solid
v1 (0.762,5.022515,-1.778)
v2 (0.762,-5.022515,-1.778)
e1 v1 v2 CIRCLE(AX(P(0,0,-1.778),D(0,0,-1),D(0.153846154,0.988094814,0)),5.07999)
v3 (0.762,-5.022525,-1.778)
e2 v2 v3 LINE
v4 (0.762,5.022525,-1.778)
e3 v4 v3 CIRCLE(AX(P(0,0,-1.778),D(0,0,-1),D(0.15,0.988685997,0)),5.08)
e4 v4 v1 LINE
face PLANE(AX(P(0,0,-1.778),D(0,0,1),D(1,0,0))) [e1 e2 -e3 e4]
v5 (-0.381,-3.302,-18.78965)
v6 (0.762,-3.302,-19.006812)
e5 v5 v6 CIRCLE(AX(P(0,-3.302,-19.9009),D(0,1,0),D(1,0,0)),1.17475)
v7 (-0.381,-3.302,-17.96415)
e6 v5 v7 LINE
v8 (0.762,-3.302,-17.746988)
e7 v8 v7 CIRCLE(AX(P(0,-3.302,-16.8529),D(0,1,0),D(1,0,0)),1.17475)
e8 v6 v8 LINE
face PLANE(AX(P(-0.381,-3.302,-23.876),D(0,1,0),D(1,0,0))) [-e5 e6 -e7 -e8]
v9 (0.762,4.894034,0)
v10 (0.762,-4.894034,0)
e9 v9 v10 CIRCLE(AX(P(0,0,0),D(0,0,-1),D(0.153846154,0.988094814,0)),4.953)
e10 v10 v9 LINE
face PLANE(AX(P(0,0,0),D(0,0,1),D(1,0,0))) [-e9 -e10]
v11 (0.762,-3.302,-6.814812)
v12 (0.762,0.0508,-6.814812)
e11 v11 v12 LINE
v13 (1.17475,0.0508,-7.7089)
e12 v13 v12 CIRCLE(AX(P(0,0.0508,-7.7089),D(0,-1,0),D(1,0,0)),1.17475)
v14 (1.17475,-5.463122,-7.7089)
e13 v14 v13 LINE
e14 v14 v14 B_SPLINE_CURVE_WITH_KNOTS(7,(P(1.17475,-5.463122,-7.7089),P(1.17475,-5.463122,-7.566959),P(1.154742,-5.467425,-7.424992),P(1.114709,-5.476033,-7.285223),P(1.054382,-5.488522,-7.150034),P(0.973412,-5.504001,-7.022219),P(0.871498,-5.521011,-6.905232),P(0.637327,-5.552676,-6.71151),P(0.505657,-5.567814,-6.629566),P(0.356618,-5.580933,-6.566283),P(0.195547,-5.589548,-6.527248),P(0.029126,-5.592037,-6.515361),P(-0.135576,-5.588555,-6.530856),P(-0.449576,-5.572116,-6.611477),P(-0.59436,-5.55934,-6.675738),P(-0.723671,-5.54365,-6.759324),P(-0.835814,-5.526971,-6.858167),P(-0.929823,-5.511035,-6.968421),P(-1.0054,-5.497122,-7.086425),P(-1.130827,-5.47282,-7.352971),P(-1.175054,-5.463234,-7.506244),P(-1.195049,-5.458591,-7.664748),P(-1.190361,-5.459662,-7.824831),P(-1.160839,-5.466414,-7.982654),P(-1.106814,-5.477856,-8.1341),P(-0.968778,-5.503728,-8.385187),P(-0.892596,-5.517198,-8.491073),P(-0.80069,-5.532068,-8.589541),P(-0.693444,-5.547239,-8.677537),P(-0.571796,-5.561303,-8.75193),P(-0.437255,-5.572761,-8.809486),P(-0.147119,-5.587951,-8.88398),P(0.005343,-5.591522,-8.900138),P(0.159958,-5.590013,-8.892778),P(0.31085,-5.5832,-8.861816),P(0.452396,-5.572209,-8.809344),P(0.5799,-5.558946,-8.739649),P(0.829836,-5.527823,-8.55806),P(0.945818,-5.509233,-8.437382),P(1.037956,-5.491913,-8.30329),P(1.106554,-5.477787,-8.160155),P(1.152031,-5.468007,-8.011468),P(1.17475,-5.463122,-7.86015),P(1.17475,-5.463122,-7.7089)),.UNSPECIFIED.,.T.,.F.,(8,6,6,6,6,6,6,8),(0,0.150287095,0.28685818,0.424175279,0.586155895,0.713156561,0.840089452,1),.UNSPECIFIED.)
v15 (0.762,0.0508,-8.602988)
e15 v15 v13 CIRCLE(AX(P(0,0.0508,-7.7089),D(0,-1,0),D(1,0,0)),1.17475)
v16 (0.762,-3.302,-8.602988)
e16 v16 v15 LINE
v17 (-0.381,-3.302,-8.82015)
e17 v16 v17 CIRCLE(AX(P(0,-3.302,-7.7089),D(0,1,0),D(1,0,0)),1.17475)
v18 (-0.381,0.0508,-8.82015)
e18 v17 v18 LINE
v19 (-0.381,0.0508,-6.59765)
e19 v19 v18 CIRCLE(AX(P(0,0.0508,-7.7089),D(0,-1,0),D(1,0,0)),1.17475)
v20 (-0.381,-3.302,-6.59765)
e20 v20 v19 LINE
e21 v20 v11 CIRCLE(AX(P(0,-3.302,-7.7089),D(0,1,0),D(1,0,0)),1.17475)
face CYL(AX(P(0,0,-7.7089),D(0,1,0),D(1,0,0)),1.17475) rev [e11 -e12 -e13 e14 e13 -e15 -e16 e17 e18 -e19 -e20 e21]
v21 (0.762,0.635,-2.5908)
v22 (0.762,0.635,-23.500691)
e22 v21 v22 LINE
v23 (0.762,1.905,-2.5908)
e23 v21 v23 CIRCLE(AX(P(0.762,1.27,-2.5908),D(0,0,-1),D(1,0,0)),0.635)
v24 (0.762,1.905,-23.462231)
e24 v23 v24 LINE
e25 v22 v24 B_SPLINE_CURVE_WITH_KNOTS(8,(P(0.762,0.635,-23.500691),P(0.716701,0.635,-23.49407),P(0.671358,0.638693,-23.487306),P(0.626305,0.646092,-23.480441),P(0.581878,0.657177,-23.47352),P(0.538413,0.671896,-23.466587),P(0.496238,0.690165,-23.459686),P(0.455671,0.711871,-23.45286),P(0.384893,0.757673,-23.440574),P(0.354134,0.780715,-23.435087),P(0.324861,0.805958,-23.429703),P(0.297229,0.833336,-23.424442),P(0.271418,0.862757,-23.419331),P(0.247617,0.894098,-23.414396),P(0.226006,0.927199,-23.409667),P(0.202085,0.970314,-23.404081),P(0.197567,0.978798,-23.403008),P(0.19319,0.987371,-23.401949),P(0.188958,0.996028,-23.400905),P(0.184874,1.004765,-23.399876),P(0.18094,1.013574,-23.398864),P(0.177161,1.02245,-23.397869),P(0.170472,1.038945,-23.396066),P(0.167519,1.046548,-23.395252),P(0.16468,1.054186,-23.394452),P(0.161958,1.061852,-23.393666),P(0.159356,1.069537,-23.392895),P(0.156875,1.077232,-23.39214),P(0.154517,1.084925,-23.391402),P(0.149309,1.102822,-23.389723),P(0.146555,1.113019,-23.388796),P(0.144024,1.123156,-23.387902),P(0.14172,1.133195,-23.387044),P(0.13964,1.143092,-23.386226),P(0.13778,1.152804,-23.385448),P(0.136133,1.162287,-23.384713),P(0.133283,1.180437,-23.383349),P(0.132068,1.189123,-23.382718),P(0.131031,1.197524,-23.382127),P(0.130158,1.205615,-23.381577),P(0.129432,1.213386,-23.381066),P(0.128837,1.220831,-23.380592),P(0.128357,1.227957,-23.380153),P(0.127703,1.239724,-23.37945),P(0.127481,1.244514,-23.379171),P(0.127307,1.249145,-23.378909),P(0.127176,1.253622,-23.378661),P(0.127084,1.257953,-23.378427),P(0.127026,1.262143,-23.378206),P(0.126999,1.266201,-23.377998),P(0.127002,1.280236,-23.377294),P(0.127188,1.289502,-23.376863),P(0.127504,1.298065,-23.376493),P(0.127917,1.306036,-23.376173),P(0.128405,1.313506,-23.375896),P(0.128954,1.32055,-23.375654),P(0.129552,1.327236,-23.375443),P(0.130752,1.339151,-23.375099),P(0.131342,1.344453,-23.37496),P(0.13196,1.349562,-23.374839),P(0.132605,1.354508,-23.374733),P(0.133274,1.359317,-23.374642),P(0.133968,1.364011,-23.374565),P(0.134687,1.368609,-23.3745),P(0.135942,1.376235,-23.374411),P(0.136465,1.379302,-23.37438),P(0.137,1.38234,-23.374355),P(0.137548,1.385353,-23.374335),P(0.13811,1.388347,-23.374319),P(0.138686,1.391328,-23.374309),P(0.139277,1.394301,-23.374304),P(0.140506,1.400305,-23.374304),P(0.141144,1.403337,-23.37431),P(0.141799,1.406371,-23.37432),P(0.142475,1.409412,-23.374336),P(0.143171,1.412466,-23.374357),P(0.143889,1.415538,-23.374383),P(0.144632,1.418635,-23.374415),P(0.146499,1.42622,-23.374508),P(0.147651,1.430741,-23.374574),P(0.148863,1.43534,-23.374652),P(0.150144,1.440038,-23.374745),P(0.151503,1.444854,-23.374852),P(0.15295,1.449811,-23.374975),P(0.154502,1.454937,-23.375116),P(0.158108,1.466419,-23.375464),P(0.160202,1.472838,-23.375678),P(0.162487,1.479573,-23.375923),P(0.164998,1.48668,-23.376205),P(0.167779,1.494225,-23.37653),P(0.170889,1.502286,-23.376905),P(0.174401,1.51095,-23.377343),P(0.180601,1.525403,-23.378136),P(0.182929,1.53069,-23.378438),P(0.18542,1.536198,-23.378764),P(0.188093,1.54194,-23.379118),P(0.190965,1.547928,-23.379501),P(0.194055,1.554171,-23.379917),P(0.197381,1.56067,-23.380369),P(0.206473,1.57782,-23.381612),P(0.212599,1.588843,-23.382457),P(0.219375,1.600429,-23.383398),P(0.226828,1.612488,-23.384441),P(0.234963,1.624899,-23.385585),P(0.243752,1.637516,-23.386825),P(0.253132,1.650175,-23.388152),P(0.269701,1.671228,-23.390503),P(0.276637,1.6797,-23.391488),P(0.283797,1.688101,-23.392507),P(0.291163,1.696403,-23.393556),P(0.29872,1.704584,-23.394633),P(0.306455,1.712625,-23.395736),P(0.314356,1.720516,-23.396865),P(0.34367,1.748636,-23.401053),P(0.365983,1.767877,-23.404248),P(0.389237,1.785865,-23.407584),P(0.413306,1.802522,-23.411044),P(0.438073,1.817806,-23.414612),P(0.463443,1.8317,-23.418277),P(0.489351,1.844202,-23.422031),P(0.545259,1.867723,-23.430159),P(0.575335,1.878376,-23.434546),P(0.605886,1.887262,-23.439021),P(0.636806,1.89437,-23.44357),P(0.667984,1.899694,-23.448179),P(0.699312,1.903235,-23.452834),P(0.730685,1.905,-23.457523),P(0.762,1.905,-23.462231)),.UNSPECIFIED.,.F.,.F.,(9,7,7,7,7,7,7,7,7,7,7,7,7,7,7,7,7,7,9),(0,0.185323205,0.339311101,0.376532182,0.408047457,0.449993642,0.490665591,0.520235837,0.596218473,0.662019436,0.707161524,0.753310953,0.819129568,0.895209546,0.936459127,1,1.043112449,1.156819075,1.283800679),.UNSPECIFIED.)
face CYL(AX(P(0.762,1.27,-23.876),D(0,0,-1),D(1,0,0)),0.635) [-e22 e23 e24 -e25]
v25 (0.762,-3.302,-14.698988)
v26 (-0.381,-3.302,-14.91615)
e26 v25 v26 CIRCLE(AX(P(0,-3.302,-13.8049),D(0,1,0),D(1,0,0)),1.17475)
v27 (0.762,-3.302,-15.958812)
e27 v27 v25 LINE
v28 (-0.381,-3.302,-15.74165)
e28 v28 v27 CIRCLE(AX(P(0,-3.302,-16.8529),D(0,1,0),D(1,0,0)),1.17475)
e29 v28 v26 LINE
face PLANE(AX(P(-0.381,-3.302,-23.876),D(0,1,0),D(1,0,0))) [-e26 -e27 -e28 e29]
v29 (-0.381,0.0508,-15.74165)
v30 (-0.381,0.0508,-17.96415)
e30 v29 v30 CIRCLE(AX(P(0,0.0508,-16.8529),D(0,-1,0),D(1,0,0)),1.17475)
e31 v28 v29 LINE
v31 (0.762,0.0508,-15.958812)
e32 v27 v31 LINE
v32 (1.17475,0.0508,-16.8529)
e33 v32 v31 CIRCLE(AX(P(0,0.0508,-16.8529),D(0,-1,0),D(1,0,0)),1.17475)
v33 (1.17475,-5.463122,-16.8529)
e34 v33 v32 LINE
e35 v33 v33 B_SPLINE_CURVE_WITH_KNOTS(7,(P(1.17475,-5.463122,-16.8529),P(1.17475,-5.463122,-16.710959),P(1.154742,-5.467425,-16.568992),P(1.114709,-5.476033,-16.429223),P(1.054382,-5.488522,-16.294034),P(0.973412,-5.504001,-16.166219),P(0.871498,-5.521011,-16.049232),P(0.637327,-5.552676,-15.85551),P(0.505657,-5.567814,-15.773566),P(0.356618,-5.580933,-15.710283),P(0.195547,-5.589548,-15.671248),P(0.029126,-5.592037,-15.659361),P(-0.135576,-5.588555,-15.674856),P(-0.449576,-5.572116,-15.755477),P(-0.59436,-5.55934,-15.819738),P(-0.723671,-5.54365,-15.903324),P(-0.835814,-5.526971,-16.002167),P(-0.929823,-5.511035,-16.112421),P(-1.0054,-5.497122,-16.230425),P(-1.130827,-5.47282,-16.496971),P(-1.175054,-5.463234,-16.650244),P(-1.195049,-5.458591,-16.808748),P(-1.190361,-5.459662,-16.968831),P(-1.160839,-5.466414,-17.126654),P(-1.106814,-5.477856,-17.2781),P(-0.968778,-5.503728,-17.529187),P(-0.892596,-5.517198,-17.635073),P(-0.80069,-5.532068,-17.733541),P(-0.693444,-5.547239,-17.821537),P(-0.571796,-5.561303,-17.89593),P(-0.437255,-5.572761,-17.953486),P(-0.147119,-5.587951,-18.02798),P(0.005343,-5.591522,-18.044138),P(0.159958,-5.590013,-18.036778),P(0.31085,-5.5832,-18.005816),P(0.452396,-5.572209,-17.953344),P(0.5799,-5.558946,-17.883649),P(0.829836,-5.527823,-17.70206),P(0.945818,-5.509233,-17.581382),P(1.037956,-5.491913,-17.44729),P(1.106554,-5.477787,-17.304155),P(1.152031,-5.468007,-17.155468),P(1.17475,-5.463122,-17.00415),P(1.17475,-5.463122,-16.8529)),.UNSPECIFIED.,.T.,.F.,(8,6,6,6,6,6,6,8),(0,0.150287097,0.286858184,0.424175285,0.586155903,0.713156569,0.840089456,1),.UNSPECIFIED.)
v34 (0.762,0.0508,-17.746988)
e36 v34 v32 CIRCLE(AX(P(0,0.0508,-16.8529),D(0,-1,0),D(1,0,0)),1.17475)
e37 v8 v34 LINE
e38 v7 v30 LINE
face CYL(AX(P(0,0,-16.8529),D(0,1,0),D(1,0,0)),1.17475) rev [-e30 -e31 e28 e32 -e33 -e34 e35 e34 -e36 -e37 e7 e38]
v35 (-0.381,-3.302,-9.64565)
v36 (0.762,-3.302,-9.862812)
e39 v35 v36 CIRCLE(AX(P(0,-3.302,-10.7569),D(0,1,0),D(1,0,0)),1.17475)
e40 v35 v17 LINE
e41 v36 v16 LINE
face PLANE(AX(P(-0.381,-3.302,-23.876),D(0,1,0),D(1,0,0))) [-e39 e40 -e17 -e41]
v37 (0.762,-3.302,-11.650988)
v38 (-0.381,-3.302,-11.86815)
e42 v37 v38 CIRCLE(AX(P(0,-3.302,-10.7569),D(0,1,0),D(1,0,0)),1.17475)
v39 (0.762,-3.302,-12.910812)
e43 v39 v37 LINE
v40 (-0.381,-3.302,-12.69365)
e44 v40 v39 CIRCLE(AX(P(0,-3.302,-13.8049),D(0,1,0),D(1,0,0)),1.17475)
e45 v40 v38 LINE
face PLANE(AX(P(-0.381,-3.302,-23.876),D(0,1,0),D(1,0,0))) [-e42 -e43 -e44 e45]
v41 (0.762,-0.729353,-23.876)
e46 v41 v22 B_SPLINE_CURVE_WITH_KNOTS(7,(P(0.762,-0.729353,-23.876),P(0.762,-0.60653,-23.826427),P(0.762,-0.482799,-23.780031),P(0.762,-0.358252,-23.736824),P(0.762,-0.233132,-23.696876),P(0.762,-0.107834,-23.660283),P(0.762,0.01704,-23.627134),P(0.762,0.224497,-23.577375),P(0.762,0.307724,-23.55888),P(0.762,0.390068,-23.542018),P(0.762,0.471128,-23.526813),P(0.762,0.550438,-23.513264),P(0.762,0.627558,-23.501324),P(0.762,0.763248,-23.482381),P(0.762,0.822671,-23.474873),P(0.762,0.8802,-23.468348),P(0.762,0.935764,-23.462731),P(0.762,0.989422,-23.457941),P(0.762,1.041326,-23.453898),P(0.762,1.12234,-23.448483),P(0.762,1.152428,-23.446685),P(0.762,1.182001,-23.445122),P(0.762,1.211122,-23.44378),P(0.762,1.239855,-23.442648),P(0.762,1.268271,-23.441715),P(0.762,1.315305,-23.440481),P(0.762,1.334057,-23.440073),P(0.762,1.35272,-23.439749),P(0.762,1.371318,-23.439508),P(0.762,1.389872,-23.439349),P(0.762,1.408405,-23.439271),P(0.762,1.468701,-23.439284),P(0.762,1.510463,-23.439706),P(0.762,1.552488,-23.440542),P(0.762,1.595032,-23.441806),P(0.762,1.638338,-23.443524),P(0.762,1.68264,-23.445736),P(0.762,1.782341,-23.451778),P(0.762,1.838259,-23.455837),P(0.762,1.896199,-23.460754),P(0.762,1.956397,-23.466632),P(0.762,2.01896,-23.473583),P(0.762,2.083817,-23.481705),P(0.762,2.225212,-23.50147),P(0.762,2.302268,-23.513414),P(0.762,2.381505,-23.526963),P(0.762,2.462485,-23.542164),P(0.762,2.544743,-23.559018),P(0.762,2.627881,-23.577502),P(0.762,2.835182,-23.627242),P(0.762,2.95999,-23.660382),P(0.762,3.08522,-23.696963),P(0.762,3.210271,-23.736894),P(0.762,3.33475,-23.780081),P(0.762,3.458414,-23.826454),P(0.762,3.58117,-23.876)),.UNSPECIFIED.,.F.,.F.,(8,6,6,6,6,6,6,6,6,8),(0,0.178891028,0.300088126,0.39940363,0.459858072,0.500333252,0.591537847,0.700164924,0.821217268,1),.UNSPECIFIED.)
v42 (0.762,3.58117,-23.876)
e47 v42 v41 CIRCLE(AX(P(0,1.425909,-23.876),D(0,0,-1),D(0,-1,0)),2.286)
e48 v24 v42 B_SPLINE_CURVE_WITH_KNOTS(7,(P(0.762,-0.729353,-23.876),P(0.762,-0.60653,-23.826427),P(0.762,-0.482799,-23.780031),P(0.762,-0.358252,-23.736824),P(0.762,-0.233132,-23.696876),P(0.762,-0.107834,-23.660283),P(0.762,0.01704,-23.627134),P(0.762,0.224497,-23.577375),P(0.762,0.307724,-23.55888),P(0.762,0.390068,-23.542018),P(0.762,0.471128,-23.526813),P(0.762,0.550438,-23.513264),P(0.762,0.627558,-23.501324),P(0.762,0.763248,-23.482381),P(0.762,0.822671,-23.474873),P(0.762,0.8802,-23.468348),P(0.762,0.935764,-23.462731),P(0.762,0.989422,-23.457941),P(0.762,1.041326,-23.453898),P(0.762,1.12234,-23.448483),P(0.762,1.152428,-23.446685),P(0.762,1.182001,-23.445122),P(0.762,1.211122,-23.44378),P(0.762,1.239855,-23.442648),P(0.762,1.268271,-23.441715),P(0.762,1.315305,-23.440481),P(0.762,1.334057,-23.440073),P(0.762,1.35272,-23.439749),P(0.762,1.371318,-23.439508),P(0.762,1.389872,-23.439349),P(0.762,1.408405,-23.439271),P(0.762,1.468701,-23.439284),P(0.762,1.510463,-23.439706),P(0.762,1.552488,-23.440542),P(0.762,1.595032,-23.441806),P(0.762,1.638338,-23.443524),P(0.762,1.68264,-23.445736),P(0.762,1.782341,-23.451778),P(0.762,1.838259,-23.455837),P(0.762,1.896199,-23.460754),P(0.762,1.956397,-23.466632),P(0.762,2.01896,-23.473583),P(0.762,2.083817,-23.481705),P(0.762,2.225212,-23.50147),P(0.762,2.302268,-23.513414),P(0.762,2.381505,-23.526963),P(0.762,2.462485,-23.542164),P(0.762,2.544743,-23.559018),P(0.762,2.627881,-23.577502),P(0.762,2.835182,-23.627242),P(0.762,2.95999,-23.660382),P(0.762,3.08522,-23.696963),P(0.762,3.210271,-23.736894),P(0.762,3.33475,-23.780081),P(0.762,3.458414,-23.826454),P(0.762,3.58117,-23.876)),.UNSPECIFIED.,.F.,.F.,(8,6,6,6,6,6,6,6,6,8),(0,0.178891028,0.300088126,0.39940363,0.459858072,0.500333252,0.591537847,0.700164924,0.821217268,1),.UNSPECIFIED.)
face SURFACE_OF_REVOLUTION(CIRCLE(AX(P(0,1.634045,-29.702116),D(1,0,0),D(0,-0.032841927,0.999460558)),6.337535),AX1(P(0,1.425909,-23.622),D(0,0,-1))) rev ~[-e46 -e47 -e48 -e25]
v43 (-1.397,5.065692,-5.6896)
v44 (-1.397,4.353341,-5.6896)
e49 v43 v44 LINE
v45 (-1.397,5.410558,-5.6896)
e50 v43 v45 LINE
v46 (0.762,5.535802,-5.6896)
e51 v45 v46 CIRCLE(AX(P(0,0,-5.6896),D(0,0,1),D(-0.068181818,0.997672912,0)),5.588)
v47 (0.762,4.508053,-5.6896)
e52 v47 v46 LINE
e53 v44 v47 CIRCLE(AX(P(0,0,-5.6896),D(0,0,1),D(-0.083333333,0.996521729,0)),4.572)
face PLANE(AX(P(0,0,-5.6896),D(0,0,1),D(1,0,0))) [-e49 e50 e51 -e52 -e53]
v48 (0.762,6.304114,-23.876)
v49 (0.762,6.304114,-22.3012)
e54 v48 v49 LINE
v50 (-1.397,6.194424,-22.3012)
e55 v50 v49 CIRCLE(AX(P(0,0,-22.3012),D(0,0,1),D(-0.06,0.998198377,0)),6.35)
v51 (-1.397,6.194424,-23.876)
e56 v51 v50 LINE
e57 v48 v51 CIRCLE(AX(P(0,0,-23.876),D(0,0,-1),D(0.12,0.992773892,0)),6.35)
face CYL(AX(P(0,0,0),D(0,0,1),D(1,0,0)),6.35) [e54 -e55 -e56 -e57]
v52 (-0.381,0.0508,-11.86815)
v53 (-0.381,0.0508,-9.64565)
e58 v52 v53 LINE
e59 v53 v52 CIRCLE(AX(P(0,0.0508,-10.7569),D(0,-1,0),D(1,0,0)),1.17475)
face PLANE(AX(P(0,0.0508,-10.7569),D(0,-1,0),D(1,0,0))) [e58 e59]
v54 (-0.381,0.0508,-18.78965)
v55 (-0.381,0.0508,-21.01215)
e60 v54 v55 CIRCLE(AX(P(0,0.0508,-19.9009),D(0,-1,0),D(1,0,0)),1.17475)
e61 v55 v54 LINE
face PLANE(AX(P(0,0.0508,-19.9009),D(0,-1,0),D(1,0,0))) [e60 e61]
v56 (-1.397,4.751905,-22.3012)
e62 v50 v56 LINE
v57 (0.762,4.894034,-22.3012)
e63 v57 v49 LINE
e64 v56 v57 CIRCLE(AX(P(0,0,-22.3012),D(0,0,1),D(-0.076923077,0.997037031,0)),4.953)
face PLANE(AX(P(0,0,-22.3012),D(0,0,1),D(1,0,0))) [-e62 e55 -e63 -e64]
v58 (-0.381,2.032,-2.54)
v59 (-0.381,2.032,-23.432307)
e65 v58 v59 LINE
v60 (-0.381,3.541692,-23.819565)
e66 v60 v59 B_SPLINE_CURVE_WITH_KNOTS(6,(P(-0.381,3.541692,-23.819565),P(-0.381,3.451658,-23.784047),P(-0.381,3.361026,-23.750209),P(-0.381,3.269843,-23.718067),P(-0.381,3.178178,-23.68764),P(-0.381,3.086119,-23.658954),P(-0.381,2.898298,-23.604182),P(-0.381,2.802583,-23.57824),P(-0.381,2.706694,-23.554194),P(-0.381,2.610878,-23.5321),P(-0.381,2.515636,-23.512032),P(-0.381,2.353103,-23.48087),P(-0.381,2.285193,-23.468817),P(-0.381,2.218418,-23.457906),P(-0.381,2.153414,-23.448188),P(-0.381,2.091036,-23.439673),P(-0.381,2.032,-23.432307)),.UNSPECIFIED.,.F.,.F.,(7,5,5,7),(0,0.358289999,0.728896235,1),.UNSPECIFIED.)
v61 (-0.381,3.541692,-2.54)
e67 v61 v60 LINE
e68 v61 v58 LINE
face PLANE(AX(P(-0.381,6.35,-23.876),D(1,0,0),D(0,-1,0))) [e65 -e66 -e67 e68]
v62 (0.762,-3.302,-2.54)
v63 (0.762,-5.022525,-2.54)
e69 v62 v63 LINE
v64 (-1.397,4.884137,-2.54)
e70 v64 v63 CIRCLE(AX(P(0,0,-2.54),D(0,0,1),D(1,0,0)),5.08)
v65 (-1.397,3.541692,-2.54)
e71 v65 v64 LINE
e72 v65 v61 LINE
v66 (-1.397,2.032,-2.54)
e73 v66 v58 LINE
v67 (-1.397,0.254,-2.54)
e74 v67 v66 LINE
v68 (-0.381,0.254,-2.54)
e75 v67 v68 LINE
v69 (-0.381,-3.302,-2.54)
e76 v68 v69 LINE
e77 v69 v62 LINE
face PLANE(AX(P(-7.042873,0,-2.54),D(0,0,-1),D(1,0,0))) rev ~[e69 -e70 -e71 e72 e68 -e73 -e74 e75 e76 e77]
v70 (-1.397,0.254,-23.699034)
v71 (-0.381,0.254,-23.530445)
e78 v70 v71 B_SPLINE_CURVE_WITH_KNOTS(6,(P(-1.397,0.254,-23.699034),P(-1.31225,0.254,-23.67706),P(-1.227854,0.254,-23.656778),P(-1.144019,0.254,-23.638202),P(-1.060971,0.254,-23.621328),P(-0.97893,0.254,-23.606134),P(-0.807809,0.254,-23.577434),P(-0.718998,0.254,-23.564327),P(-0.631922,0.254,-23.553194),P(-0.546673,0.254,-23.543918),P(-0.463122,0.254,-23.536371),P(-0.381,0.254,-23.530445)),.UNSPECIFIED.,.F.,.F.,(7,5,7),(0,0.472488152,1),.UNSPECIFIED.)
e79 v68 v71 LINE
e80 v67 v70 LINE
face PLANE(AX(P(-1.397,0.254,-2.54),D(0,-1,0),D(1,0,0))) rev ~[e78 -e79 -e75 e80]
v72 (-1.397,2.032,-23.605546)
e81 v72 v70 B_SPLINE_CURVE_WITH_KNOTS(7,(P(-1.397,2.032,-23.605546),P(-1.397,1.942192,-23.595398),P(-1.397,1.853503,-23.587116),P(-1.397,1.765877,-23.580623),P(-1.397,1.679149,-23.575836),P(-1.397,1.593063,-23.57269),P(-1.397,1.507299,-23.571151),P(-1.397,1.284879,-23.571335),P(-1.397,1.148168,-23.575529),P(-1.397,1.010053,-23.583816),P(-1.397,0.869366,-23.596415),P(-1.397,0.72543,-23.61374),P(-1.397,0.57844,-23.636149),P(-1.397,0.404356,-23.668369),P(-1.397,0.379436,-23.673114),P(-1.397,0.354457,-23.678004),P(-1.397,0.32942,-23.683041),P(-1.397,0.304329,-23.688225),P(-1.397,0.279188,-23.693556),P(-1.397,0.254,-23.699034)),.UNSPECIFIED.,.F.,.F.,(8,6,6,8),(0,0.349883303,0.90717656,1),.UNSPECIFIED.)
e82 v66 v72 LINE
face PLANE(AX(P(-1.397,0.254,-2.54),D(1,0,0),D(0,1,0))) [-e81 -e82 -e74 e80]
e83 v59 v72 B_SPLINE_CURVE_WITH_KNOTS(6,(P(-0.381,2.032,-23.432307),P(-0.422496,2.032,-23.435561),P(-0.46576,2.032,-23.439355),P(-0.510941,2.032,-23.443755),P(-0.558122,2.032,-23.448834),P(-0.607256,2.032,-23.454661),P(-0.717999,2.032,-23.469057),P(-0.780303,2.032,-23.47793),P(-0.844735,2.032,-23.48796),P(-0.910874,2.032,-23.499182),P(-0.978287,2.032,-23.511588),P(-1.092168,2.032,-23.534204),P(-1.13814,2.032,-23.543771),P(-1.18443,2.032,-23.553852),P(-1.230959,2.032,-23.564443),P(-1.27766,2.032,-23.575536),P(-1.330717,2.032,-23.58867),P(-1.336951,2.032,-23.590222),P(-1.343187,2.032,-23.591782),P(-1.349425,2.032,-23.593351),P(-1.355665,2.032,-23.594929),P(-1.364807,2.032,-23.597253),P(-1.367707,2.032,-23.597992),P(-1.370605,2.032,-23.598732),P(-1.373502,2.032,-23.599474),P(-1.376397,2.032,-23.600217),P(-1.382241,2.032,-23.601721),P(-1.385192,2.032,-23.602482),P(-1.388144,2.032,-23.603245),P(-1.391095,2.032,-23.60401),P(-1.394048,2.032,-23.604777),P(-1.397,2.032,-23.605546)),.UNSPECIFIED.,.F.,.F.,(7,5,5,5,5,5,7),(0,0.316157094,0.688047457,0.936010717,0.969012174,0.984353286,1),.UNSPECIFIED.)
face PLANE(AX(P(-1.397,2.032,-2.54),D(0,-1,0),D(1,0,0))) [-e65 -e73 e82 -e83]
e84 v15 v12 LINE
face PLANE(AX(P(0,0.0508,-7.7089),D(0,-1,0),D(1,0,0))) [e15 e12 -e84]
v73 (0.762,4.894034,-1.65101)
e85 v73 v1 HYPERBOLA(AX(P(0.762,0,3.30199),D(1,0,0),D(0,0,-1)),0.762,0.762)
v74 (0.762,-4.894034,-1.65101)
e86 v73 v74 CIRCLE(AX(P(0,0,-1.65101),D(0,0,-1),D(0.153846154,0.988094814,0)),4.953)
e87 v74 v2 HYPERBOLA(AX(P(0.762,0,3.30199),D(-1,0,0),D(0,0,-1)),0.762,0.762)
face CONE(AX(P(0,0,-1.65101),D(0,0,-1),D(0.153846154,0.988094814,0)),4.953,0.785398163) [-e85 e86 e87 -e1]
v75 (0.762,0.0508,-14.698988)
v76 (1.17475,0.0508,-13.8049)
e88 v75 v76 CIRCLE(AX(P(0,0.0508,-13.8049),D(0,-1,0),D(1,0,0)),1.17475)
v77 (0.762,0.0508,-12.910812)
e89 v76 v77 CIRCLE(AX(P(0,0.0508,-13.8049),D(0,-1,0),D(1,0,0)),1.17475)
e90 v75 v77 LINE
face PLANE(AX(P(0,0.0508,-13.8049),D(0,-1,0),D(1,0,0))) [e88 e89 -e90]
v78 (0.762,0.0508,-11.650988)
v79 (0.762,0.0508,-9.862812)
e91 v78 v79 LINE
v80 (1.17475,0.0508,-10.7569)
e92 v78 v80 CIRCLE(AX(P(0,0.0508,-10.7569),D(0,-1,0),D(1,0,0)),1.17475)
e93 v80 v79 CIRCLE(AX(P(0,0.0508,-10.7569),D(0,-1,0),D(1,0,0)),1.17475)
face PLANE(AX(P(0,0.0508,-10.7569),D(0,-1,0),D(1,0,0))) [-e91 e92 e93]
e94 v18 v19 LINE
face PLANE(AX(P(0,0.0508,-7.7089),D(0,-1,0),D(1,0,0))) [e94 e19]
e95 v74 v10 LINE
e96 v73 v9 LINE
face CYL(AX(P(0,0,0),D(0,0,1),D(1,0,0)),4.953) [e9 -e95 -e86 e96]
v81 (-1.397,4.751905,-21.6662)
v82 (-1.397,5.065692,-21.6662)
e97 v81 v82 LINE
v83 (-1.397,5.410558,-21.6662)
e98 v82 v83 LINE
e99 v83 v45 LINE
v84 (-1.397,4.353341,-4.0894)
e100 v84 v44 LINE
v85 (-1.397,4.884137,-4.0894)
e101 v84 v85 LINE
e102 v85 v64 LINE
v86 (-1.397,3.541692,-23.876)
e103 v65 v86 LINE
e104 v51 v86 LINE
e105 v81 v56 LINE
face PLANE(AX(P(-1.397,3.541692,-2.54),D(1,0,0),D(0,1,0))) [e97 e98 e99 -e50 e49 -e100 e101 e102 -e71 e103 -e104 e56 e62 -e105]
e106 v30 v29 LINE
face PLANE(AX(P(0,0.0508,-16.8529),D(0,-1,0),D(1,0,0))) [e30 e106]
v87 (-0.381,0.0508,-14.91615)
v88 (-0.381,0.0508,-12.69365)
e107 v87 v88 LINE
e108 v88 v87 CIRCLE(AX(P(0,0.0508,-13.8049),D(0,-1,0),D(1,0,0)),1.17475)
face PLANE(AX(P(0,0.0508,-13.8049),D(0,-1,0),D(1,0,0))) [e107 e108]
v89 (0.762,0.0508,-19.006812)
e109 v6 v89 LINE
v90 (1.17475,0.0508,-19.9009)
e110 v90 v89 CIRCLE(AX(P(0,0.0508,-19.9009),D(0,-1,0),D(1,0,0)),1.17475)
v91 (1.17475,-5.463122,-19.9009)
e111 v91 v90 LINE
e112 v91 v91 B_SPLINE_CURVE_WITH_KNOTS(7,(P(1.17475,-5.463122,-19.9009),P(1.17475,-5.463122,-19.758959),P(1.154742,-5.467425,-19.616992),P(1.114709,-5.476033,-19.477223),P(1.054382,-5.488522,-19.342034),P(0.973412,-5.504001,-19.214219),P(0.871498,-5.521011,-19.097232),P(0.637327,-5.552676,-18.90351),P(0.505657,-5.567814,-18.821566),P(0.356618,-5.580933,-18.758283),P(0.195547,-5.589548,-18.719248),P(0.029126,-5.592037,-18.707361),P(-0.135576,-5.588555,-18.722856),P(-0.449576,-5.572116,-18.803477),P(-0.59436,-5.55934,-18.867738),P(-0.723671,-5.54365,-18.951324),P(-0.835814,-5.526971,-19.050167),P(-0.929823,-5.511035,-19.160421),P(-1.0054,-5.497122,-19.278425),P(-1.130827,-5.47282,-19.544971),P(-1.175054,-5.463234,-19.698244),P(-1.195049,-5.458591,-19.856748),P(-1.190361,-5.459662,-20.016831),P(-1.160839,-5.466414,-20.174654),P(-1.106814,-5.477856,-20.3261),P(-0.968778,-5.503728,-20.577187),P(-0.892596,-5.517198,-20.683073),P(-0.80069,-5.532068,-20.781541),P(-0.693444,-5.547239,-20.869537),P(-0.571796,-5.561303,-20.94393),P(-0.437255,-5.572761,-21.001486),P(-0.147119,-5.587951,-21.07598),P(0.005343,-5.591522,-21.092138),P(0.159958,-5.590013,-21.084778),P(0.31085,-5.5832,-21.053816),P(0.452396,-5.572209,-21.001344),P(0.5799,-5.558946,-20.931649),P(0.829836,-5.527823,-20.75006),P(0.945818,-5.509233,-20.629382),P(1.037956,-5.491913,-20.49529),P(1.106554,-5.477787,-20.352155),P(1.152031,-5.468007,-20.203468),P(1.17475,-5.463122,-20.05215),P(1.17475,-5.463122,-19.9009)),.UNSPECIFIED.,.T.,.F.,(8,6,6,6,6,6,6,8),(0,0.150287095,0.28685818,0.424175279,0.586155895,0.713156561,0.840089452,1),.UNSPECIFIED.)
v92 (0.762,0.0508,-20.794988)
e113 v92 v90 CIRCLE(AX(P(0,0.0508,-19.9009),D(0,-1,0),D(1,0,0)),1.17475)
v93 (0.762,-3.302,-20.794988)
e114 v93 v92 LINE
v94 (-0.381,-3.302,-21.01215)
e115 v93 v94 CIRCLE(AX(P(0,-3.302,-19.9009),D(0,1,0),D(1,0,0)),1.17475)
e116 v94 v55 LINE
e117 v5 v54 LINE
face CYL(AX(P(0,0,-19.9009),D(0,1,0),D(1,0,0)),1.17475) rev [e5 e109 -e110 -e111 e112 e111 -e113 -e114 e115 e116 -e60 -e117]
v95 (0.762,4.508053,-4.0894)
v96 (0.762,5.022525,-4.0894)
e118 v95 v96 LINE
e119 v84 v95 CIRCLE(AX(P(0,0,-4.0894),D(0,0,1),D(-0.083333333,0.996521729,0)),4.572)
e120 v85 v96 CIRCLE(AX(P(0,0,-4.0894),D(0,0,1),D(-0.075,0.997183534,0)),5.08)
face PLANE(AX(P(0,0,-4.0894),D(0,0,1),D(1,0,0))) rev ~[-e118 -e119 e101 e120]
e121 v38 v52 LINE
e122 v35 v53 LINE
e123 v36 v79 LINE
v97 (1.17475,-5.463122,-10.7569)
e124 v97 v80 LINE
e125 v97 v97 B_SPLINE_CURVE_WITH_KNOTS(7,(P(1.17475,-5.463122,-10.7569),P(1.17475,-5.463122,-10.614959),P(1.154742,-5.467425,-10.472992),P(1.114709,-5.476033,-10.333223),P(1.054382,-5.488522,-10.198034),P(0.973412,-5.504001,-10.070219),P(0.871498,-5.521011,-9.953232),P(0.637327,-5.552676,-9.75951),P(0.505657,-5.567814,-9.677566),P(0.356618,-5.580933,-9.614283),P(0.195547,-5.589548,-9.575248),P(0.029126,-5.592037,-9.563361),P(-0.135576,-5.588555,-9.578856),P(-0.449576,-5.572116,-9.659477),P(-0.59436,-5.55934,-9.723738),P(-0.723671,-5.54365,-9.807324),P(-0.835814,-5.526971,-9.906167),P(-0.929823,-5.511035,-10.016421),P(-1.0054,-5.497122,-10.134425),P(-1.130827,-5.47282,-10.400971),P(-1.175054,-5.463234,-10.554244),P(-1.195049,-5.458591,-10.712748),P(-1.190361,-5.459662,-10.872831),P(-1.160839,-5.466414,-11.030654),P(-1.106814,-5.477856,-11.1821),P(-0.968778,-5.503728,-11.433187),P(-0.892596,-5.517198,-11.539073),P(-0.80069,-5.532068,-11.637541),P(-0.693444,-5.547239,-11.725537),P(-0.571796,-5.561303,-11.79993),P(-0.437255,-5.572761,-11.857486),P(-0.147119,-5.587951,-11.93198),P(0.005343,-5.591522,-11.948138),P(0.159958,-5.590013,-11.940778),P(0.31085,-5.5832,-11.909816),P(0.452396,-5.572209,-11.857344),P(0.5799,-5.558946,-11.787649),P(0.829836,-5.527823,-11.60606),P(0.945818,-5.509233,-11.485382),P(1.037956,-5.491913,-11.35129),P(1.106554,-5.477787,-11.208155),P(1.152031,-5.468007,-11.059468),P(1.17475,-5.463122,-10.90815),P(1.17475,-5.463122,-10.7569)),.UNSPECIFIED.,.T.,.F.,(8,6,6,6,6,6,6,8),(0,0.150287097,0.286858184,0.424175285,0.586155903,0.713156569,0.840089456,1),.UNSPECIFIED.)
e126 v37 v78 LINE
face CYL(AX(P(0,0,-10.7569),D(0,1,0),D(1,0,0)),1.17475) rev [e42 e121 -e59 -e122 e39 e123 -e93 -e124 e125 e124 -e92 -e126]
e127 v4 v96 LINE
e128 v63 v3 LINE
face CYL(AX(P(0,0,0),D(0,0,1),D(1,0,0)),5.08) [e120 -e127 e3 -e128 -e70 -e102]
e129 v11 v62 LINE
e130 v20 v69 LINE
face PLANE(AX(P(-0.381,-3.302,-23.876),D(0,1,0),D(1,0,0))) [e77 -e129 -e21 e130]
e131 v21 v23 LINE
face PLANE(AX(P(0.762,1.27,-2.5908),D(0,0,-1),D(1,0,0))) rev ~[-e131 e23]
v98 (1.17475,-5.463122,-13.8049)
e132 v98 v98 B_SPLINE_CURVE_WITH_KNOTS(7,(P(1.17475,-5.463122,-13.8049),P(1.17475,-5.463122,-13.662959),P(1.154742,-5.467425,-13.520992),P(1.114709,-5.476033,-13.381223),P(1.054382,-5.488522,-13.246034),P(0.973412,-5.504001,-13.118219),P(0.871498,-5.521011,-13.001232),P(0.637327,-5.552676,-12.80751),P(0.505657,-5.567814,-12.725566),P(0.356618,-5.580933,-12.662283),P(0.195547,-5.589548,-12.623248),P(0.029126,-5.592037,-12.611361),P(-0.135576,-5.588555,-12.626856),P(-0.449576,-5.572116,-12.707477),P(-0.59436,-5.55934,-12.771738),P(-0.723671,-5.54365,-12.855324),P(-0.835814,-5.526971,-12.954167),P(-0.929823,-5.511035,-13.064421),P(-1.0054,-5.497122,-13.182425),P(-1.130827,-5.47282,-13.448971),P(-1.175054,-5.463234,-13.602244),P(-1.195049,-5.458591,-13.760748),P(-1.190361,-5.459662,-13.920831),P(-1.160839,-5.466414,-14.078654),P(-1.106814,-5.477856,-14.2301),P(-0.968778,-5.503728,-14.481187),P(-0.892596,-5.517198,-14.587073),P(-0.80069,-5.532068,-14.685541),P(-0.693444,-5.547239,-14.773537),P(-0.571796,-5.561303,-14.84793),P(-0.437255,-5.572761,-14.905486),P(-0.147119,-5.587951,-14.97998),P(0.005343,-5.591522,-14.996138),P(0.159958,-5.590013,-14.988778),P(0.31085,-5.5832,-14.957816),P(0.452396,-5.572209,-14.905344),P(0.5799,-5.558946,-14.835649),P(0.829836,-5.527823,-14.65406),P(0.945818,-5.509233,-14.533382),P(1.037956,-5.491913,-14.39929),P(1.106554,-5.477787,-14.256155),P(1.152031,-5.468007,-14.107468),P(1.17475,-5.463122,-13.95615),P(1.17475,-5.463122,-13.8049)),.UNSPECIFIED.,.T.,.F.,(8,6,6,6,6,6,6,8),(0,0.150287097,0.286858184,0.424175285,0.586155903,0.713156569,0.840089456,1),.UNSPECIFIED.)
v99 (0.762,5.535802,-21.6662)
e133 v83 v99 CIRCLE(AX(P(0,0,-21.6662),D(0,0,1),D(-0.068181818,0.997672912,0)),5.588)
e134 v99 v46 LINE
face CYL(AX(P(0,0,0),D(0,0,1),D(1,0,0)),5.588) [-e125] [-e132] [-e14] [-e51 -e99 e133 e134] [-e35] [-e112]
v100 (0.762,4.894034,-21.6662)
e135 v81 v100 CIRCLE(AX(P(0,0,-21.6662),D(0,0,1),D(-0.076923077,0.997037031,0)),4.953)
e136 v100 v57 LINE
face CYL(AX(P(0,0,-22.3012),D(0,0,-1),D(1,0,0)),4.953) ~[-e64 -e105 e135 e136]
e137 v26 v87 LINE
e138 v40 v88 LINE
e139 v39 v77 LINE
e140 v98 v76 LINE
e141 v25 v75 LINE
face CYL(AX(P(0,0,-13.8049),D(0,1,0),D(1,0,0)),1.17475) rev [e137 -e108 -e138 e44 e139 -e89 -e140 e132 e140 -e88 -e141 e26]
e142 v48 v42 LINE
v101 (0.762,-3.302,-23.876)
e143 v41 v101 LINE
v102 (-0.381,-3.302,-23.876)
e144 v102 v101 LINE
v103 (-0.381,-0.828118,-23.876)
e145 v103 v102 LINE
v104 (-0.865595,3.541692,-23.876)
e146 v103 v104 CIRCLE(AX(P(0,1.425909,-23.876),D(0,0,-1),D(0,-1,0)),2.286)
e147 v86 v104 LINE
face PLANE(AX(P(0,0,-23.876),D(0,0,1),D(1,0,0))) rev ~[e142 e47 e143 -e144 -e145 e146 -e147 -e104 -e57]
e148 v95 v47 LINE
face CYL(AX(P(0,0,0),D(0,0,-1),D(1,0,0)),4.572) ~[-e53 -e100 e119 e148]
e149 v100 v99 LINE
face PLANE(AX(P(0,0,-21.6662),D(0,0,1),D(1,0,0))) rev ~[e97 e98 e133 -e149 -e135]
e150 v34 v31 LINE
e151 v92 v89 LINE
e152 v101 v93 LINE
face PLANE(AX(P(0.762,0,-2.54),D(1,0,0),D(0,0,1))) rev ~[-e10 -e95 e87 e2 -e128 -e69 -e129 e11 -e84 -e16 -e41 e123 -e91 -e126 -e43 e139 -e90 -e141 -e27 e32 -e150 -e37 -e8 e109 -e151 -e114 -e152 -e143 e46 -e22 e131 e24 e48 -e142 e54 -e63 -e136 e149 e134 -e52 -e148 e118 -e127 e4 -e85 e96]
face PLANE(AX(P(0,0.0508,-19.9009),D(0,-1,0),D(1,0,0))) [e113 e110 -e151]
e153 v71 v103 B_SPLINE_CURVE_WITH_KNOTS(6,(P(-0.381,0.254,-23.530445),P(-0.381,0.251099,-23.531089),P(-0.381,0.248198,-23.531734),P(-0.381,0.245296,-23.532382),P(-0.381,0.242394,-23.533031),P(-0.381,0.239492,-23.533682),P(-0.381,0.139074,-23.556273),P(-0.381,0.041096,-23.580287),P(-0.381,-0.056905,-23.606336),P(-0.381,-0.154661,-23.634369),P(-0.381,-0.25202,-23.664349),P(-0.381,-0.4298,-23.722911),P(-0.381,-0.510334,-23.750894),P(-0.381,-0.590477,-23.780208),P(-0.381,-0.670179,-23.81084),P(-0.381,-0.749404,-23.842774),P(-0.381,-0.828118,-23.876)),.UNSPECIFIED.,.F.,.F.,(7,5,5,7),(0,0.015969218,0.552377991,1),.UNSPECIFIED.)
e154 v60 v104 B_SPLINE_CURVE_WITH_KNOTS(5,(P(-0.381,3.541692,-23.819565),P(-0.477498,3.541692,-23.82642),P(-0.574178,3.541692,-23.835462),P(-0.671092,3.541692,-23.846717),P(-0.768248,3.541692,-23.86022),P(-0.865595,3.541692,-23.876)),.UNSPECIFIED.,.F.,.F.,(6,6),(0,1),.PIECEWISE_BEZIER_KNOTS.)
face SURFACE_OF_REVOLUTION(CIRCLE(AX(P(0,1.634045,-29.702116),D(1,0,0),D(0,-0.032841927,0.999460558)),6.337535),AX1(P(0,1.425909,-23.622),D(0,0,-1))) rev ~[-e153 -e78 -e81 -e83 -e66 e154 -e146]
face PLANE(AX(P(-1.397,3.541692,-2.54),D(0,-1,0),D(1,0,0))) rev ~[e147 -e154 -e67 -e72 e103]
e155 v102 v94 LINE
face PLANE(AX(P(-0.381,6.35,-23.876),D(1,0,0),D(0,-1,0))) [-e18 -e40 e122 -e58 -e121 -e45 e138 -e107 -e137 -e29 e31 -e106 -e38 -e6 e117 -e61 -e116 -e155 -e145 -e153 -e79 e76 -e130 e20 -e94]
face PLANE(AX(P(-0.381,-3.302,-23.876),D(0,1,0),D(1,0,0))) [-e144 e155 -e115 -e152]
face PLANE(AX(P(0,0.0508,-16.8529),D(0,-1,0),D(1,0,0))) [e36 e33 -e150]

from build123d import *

# Parameters (mm, degrees)
F0_R          = 6.35
F1_DEPTH      = 23.876
F2_R          = 6.35
F2_R_2        = 5.588
F3_DEPTH      = 22.3012
F4_R          = 5.842
F4_R_2        = 4.953
F5_DEPTH      = 0.635
F6_R          = 1.17475
F7_DEPTH      = 5.7404
F7_DEPTH_BACK = 0.0508
F8_R          = 5.715
F8_R_2        = 4.572
F9_DEPTH      = 5.6896
F10_R         = 5.08
F10_R_2       = 4.572
F11_DEPTH     = 4.0894
F12_W         = 7.8048733994
F12_H         = 4.4421355706
F13_DEPTH     = 5.6896
F14_R         = 5.08
F14_R_2       = 4.953
F15_DEPTH     = 1.778
F16_SIZE      = 0.12699
F17_W         = 1.143
F17_H         = 9.652
F18_DEPTH     = 23.877
F19_W         = 1.016
F19_H         = 1.524
F20_DEPTH     = 21.9456
F21_W         = 1.016
F21_H         = 1.5748
F22_DEPTH     = 1.9304
F23_W         = 1.016
F23_H         = 1.778
F24_DEPTH     = 21.336
F25_R         = 0.635
F26_DEPTH     = 21.2852
F29_W         = 1.1630140017
F29_H         = 0.8712620474
F30_DEPTH     = 25.4


# Not quite as in the source:
# - a fillet or chamfer is up to 0.001 mm smaller than in the source, because OpenCascade refuses the exact size


with BuildPart() as f1:
    # F0 (on Top) → F1 (new body)
    with BuildSketch(Plane.XY):
        Circle(F0_R)
    extrude(amount=-F1_DEPTH)

    # F2 (on Top) → F3 (cut)
    with BuildSketch(Plane.XY):
        Circle(F2_R)
        Circle(F2_R_2, mode=Mode.SUBTRACT)
    extrude(amount=-F3_DEPTH, mode=Mode.SUBTRACT)

    # F4 (on face) → F5 (cut)
    with BuildSketch(Plane.XY.offset(-22.3012)):
        Circle(F4_R)
        Circle(F4_R_2, mode=Mode.SUBTRACT)
    extrude(amount=F5_DEPTH, mode=Mode.SUBTRACT)

    # F6 (on Front) → F7 (cut, two sides)
    with BuildSketch(Plane.XZ) as f7_sk:
        with Locations((0, -19.9009)):
            Circle(F6_R)
        with Locations((0, -16.8529)):
            Circle(F6_R)
        with Locations((0, -13.8049)):
            Circle(F6_R)
        with Locations((0, -10.7569)):
            Circle(F6_R)
        with Locations((0, -7.7089)):
            Circle(F6_R)
    extrude(amount=F7_DEPTH, mode=Mode.SUBTRACT)
    extrude(f7_sk.sketch, amount=-F7_DEPTH_BACK, mode=Mode.SUBTRACT)

    # F8 (on face) → F9 (cut, symmetric)
    with BuildSketch(Plane.XY):
        Circle(F8_R)
        Circle(F8_R_2, mode=Mode.SUBTRACT)
    extrude(amount=F9_DEPTH, both=True, mode=Mode.SUBTRACT)

    # F10 (on face) → F11 (join)
    with BuildSketch(Plane.XY):
        Circle(F10_R)
        Circle(F10_R_2, mode=Mode.SUBTRACT)
    extrude(amount=-F11_DEPTH)

    # F12 (on Front) → F13 (cut, symmetric)
    with BuildSketch(Plane.XZ):
        with Locations((-3.1404366997, -0.3189322147)):
            Rectangle(F12_W, F12_H)
    extrude(amount=F13_DEPTH, both=True, mode=Mode.SUBTRACT)

    # F14 (on face) → F15 (cut)
    with BuildSketch(Plane.XY):
        Circle(F14_R)
        Circle(F14_R_2, mode=Mode.SUBTRACT)
    extrude(amount=-F15_DEPTH, mode=Mode.SUBTRACT)

    # F16 (size 0.127 in the source; OpenCascade refuses exactly that, so slightly less here)
    f16_edges = [f1.edges().sort_by_distance(p)[0] for p in [
        (4.953, 0, -1.778),
    ]]
    chamfer(f16_edges, length=F16_SIZE)

    # F17 (on face) → F18 (cut, through all)
    with BuildSketch(Plane(origin=(0, 0, -23.876), x_dir=(1, 0, 0), z_dir=(0, 0, -1))):
        with Locations((0.1905, -1.524)):
            Rectangle(F17_W, F17_H)
    extrude(amount=-F18_DEPTH, mode=Mode.SUBTRACT)

    # F19 (on face) → F20 (cut)
    with BuildSketch(Plane.XY.offset(-2.54)):
        with Locations((-0.889, 4.3036923515)):
            Rectangle(F19_W, F19_H)
    extrude(amount=-F20_DEPTH, mode=Mode.SUBTRACT)

    # F21 (on face) → F22 (cut)
    with BuildSketch(Plane.XZ.offset(-5.0656923515)):
        with Locations((-0.889, -23.0886)):
            Rectangle(F21_W, F21_H)
    extrude(amount=-F22_DEPTH, mode=Mode.SUBTRACT)

    # F23 (on face) → F24 (cut, through all)
    with BuildSketch(Plane.XY.offset(-2.54)):
        with Locations((-0.889, 1.143)):
            Rectangle(F23_W, F23_H)
    extrude(amount=-F24_DEPTH, mode=Mode.SUBTRACT)

    # F25 (on face) → F26 (join)
    with BuildSketch(Plane(origin=(0, 0, -23.876), x_dir=(1, 0, 0), z_dir=(0, 0, -1))):
        with Locations((0.762, -1.27)):
            Circle(F25_R)
    extrude(amount=-F26_DEPTH)

    # F27 (on Right) → F28 (revolve, cut)
    with BuildSketch(Plane.YZ):
        with BuildLine():
            Line((1.4259085423, -23.876), (1.4259085423, -23.368))
            ThreePointArc((1.4259085423, -23.368), (0.2592411198, -23.5154965988), (-0.8600914577, -23.876))
            Line((-0.8600914577, -23.876), (1.4259085423, -23.876))
        make_face()
    revolve(axis=Axis((0, 1.4259085423, -23.622), (0, 0, -1)), mode=Mode.SUBTRACT)

    # F29 (on face) → F30 (cut)
    with BuildSketch(Plane.XY.offset(-5.6896)):
        with Locations((-0.8154929991, 5.274676485)):
            Rectangle(F29_W, F29_H)
    extrude(amount=-F30_DEPTH, mode=Mode.SUBTRACT)


solid = f1.part
